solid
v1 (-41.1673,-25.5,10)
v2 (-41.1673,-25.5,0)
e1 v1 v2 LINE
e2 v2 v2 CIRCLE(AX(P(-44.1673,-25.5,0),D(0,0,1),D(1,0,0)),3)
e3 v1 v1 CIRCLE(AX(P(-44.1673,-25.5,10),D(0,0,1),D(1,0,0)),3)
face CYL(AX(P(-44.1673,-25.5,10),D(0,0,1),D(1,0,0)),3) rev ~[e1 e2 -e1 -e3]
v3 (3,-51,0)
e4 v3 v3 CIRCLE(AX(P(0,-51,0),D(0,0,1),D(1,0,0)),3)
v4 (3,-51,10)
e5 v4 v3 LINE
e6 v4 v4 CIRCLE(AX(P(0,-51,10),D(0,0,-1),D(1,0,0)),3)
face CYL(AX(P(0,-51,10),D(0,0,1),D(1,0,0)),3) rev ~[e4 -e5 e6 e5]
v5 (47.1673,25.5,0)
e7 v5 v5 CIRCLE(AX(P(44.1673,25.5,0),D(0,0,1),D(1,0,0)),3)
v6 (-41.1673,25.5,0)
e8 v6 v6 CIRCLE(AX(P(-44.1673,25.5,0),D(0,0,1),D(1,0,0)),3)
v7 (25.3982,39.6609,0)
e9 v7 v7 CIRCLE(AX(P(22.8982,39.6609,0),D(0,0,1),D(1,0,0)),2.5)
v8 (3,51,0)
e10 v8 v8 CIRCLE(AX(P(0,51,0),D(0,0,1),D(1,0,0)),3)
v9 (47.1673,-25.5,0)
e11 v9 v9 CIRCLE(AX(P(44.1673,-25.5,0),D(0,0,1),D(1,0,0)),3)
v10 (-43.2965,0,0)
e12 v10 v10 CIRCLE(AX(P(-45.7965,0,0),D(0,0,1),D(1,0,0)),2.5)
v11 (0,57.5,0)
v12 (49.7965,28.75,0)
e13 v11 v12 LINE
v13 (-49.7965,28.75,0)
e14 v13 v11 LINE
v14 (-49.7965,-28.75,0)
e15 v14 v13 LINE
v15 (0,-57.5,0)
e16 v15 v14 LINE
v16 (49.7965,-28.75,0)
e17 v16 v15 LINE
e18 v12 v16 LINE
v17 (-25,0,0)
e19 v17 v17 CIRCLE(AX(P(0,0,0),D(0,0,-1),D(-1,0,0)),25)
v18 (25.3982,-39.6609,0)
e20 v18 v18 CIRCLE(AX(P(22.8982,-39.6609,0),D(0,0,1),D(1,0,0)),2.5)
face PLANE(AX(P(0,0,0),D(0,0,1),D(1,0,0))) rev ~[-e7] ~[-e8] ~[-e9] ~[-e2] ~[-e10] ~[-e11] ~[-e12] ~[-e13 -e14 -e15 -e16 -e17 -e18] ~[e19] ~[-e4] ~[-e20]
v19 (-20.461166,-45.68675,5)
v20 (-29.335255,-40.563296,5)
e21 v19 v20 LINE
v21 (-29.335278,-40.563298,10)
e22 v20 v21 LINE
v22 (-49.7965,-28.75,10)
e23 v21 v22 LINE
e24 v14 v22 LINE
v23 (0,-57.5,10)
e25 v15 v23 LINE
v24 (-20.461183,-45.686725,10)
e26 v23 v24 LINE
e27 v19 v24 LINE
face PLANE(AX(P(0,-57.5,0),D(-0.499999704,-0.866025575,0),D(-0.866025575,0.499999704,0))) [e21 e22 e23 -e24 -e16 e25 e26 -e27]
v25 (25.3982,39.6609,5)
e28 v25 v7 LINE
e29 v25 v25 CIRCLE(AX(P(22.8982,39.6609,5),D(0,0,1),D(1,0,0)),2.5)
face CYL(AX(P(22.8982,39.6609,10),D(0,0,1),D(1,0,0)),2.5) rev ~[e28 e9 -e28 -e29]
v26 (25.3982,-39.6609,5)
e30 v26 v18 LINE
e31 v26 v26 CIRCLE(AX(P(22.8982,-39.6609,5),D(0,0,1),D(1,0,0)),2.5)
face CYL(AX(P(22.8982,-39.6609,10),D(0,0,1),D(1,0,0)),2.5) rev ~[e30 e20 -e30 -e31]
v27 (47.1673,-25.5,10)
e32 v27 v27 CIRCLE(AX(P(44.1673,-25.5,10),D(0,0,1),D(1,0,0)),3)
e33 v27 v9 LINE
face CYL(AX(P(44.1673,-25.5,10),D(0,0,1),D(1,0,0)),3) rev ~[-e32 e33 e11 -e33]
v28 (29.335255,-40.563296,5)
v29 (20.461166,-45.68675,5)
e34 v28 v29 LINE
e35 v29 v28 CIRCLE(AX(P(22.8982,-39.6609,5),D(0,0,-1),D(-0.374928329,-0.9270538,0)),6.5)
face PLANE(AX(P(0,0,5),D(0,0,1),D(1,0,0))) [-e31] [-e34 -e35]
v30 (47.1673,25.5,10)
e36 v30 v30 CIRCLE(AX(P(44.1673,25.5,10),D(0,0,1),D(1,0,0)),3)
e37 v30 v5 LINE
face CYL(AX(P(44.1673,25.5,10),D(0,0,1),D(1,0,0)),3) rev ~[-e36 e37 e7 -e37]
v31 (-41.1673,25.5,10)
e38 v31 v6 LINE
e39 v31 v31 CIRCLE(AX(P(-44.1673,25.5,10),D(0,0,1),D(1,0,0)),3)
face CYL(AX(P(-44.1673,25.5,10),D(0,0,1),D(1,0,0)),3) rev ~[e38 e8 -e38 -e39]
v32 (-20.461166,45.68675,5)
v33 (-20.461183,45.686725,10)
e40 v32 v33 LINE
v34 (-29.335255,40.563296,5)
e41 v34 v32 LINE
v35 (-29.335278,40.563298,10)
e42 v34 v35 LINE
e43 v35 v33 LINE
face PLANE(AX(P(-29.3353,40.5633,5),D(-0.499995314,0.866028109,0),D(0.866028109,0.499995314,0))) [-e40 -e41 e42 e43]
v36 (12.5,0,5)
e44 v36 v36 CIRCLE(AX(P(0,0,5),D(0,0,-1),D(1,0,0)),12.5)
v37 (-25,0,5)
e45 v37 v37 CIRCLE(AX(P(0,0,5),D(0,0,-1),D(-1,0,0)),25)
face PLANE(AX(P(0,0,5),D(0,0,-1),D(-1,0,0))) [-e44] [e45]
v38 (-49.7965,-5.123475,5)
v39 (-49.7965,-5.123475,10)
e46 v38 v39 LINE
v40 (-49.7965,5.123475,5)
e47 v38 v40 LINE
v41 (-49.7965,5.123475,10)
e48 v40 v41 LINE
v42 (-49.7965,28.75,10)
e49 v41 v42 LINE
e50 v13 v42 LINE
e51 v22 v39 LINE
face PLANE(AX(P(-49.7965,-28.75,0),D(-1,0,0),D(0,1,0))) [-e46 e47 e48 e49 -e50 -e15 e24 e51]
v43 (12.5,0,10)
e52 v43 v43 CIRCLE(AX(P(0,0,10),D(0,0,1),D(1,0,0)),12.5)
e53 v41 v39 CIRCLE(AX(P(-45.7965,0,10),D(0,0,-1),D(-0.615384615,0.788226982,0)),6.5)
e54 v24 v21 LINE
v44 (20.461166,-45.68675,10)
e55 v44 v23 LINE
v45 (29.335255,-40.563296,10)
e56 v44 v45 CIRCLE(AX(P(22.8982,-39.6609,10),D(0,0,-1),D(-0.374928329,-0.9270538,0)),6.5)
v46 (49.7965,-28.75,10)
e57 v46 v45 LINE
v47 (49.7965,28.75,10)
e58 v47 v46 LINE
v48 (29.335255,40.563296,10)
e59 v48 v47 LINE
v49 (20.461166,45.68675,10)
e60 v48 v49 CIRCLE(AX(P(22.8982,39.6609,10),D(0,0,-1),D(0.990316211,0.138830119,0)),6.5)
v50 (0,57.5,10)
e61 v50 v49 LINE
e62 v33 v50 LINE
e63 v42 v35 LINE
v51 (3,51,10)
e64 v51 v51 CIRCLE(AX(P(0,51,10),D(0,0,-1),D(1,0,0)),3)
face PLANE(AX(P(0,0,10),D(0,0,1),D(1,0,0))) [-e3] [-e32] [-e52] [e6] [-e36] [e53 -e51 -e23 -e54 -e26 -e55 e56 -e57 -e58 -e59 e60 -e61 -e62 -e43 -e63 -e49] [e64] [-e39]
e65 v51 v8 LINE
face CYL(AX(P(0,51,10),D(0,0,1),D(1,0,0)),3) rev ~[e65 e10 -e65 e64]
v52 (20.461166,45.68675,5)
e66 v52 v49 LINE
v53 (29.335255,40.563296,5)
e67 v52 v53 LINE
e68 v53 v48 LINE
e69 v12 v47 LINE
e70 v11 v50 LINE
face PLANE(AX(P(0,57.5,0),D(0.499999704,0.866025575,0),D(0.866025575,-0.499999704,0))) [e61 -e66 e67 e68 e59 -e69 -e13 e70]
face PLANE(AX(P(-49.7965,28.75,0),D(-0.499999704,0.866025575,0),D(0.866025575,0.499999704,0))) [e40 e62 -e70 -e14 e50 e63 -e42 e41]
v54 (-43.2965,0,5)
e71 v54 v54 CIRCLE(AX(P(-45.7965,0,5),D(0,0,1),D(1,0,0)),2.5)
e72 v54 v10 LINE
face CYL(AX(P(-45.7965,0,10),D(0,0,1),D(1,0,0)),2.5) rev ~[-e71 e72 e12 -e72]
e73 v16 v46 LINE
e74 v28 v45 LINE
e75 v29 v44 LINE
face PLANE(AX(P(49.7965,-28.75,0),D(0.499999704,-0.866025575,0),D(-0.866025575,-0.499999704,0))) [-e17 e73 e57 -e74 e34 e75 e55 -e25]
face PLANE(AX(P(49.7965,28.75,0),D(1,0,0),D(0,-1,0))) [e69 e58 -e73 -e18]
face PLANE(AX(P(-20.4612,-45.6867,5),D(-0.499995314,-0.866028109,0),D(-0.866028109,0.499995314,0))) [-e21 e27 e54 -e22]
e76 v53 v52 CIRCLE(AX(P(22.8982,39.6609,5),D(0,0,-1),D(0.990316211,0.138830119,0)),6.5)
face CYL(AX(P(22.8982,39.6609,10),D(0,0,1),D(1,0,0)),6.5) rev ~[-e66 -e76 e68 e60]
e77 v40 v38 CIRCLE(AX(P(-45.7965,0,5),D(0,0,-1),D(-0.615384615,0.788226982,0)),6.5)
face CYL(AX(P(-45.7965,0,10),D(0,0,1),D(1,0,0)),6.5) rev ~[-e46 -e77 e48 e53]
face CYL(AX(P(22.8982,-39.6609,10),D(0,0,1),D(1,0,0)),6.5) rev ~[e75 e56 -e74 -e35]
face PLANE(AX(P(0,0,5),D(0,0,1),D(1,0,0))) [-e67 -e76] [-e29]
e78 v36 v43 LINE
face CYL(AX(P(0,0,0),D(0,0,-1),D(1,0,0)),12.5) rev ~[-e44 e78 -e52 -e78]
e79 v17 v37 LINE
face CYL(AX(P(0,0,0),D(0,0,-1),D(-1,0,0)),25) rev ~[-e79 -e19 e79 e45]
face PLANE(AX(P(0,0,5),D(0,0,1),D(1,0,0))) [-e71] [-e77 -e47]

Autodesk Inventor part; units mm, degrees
ref_plane "YZ Plane" through (0, 0, 0) normal (1, 0, 0) x (0, 1, 0)
ref_plane "XZ Plane" through (0, 0, 0) normal (0, 1, 0) x (-1, 0, 0)
ref_plane "XY Plane" through (0, 0, 0) normal (0, 0, 1) x (1, 0, 0)
sketch "Sketch1" plane through (0, 0, 0) normal (0, 0, 1) x (1, 0, 0)
  circle A0 centre (0, 0) radius 12.5
  circle A1 centre (-30, 0) radius 3
  circle A2 centre (-15, -25.9808) radius 3
  circle A3 centre (15, -25.9808) radius 3
  circle A4 centre (30, 0) radius 3
  circle A5 centre (15, 25.9808) radius 3
  circle A6 centre (-15, 25.9808) radius 3
  line L0 (0, 57.5) -> (49.7965, 28.75)
  line L1 (49.7965, 28.75) -> (49.7965, -28.75)
  line L2 (49.7965, -28.75) -> (0, -57.5)
  line L3 (0, -57.5) -> (-49.7965, -28.75)
  line L4 (-49.7965, -28.75) -> (-49.7965, 28.75)
  line L5 (-49.7965, 28.75) -> (0, 57.5)
  point P0 (49.7965, 0)
  dimension "d0" = 25
  dimension "d2" = 6
  dimension "d6" = 360
  dimension "d15" = 30
  dimension "d33" = 115
extrude "Extrusion1" add sketch "Sketch1" along normal blind 10 contours A1 | A2 | A3 | A4 | A5 | A6 | L0 L1 L2 L3 L4 L5
sketch "Sketch7" plane through (0, 0, 10) normal (0, 0, 1) x (1, 0, 0)
  circle A0 centre (0, 51) radius 3
  circle A1 centre (-44.1673, 25.5) radius 3
  circle A2 centre (-44.1673, -25.5) radius 3
  circle A3 centre (0, -51) radius 3
  circle A4 centre (44.1673, -25.5) radius 3
  circle A5 centre (44.1673, 25.5) radius 3
  line L0 (0, 51) -> (0, -51)
  point P0 (0, 0)
  dimension "d42" = 6
  dimension "d46" = 360
  dimension "d96" = 102
extrude "Extrusion6" cut sketch "Sketch7" against normal through all
sketch "Sketch9" plane through (0, 0, 0) normal (0, 0, -1) x (-1, 0, 0)
  circle A0 centre (0, 0) radius 25
  dimension "d56" = 50
extrude "Extrusion8" cut sketch "Sketch9" against normal blind 5
sketch "Sketch14" plane through (0, 0, 10) normal (0, 0, 1) x (1, 0, 0)
  circle A0 centre (-45.7965, 0) radius 2.5
  circle A1 centre (-22.8982, -39.6609) radius 2.5
  circle A2 centre (22.8982, -39.6609) radius 2.5
  circle A3 centre (45.7965, 0) radius 2.5
  circle A4 centre (22.8982, 39.6609) radius 2.5
  circle A5 centre (-22.8982, 39.6609) radius 2.5
  line L0 (-49.7965, 28.75) -> (-49.7965, -28.75) projected
  point P0 (0, 0)
  point P1 (-45.7965, 0)
  dimension "d81" = 5
  dimension "d85" = 360
  dimension "d97" = 4
extrude "Extrusion13" cut sketch "Sketch14" against normal through all
sketch "Sketch15" plane through (0, 0, 10) normal (0, 0, 1) x (1, 0, 0)
  circle A0 centre (-22.8982, 39.6609) radius 2.5 projected
  circle A1 centre (-22.8982, 39.6609) radius 6.5
  circle A2 centre (-45.7965, 0) radius 6.5
  circle A3 centre (-22.8982, -39.6609) radius 6.5
  circle A4 centre (22.8982, -39.6609) radius 6.5
  circle A5 centre (45.7965, 0) radius 6.5
  circle A6 centre (22.8982, 39.6609) radius 6.5
  point P0 (0, 0)
  dimension "d89" = 13
  dimension "d92" = 360
extrude "Extrusion14" cut sketch "Sketch15" against normal blind 5 contours A0 | A1 | A2 | A3 | A4 | A5 | A6
sketch "Sketch16" plane through (0, 0, 5) normal (0, 0, 1) x (1, 0, 0)
  line L0 (-29.3353, 40.5633) -> (-20.4612, 45.6867) projected
  arc A0 (-29.3353, 40.5633) -> (-20.4612, 45.6867) centre (-22.8982, 39.6609) ccw projected
  circle A1 centre (-22.8982, 39.6609) radius 2.5 projected
  line L1 (49.7965, 5.1235) -> (49.7965, -5.1235) projected
  arc A2 (49.7965, 5.1235) -> (49.7965, -5.1235) centre (45.7965, 0) ccw projected
  circle A3 centre (45.7965, 0) radius 2.5 projected
  line L2 (-20.4612, -45.6867) -> (-29.3353, -40.5633) projected
  arc A4 (-20.4612, -45.6867) -> (-29.3353, -40.5633) centre (-22.8982, -39.6609) ccw projected
  circle A5 centre (-22.8982, -39.6609) radius 2.5 projected
  point P0 (0, 0)
extrude "Extrusion15" add sketch "Sketch16" along normal blind 5
sketch "Sketch17" plane through (0, 0, 10) normal (0, 0, 1) x (1, 0, 0)
  circle A0 centre (-22.8982, 39.6609) radius 2.5 projected
  circle A1 centre (45.7965, 0) radius 2.5 projected
  circle A2 centre (-22.8982, -39.6609) radius 2.5 projected
  point P0 (0, 0)
extrude "Extrusion16" add sketch "Sketch17" against normal blind 10
properties part number "TA01" material "ABS Plastic"
